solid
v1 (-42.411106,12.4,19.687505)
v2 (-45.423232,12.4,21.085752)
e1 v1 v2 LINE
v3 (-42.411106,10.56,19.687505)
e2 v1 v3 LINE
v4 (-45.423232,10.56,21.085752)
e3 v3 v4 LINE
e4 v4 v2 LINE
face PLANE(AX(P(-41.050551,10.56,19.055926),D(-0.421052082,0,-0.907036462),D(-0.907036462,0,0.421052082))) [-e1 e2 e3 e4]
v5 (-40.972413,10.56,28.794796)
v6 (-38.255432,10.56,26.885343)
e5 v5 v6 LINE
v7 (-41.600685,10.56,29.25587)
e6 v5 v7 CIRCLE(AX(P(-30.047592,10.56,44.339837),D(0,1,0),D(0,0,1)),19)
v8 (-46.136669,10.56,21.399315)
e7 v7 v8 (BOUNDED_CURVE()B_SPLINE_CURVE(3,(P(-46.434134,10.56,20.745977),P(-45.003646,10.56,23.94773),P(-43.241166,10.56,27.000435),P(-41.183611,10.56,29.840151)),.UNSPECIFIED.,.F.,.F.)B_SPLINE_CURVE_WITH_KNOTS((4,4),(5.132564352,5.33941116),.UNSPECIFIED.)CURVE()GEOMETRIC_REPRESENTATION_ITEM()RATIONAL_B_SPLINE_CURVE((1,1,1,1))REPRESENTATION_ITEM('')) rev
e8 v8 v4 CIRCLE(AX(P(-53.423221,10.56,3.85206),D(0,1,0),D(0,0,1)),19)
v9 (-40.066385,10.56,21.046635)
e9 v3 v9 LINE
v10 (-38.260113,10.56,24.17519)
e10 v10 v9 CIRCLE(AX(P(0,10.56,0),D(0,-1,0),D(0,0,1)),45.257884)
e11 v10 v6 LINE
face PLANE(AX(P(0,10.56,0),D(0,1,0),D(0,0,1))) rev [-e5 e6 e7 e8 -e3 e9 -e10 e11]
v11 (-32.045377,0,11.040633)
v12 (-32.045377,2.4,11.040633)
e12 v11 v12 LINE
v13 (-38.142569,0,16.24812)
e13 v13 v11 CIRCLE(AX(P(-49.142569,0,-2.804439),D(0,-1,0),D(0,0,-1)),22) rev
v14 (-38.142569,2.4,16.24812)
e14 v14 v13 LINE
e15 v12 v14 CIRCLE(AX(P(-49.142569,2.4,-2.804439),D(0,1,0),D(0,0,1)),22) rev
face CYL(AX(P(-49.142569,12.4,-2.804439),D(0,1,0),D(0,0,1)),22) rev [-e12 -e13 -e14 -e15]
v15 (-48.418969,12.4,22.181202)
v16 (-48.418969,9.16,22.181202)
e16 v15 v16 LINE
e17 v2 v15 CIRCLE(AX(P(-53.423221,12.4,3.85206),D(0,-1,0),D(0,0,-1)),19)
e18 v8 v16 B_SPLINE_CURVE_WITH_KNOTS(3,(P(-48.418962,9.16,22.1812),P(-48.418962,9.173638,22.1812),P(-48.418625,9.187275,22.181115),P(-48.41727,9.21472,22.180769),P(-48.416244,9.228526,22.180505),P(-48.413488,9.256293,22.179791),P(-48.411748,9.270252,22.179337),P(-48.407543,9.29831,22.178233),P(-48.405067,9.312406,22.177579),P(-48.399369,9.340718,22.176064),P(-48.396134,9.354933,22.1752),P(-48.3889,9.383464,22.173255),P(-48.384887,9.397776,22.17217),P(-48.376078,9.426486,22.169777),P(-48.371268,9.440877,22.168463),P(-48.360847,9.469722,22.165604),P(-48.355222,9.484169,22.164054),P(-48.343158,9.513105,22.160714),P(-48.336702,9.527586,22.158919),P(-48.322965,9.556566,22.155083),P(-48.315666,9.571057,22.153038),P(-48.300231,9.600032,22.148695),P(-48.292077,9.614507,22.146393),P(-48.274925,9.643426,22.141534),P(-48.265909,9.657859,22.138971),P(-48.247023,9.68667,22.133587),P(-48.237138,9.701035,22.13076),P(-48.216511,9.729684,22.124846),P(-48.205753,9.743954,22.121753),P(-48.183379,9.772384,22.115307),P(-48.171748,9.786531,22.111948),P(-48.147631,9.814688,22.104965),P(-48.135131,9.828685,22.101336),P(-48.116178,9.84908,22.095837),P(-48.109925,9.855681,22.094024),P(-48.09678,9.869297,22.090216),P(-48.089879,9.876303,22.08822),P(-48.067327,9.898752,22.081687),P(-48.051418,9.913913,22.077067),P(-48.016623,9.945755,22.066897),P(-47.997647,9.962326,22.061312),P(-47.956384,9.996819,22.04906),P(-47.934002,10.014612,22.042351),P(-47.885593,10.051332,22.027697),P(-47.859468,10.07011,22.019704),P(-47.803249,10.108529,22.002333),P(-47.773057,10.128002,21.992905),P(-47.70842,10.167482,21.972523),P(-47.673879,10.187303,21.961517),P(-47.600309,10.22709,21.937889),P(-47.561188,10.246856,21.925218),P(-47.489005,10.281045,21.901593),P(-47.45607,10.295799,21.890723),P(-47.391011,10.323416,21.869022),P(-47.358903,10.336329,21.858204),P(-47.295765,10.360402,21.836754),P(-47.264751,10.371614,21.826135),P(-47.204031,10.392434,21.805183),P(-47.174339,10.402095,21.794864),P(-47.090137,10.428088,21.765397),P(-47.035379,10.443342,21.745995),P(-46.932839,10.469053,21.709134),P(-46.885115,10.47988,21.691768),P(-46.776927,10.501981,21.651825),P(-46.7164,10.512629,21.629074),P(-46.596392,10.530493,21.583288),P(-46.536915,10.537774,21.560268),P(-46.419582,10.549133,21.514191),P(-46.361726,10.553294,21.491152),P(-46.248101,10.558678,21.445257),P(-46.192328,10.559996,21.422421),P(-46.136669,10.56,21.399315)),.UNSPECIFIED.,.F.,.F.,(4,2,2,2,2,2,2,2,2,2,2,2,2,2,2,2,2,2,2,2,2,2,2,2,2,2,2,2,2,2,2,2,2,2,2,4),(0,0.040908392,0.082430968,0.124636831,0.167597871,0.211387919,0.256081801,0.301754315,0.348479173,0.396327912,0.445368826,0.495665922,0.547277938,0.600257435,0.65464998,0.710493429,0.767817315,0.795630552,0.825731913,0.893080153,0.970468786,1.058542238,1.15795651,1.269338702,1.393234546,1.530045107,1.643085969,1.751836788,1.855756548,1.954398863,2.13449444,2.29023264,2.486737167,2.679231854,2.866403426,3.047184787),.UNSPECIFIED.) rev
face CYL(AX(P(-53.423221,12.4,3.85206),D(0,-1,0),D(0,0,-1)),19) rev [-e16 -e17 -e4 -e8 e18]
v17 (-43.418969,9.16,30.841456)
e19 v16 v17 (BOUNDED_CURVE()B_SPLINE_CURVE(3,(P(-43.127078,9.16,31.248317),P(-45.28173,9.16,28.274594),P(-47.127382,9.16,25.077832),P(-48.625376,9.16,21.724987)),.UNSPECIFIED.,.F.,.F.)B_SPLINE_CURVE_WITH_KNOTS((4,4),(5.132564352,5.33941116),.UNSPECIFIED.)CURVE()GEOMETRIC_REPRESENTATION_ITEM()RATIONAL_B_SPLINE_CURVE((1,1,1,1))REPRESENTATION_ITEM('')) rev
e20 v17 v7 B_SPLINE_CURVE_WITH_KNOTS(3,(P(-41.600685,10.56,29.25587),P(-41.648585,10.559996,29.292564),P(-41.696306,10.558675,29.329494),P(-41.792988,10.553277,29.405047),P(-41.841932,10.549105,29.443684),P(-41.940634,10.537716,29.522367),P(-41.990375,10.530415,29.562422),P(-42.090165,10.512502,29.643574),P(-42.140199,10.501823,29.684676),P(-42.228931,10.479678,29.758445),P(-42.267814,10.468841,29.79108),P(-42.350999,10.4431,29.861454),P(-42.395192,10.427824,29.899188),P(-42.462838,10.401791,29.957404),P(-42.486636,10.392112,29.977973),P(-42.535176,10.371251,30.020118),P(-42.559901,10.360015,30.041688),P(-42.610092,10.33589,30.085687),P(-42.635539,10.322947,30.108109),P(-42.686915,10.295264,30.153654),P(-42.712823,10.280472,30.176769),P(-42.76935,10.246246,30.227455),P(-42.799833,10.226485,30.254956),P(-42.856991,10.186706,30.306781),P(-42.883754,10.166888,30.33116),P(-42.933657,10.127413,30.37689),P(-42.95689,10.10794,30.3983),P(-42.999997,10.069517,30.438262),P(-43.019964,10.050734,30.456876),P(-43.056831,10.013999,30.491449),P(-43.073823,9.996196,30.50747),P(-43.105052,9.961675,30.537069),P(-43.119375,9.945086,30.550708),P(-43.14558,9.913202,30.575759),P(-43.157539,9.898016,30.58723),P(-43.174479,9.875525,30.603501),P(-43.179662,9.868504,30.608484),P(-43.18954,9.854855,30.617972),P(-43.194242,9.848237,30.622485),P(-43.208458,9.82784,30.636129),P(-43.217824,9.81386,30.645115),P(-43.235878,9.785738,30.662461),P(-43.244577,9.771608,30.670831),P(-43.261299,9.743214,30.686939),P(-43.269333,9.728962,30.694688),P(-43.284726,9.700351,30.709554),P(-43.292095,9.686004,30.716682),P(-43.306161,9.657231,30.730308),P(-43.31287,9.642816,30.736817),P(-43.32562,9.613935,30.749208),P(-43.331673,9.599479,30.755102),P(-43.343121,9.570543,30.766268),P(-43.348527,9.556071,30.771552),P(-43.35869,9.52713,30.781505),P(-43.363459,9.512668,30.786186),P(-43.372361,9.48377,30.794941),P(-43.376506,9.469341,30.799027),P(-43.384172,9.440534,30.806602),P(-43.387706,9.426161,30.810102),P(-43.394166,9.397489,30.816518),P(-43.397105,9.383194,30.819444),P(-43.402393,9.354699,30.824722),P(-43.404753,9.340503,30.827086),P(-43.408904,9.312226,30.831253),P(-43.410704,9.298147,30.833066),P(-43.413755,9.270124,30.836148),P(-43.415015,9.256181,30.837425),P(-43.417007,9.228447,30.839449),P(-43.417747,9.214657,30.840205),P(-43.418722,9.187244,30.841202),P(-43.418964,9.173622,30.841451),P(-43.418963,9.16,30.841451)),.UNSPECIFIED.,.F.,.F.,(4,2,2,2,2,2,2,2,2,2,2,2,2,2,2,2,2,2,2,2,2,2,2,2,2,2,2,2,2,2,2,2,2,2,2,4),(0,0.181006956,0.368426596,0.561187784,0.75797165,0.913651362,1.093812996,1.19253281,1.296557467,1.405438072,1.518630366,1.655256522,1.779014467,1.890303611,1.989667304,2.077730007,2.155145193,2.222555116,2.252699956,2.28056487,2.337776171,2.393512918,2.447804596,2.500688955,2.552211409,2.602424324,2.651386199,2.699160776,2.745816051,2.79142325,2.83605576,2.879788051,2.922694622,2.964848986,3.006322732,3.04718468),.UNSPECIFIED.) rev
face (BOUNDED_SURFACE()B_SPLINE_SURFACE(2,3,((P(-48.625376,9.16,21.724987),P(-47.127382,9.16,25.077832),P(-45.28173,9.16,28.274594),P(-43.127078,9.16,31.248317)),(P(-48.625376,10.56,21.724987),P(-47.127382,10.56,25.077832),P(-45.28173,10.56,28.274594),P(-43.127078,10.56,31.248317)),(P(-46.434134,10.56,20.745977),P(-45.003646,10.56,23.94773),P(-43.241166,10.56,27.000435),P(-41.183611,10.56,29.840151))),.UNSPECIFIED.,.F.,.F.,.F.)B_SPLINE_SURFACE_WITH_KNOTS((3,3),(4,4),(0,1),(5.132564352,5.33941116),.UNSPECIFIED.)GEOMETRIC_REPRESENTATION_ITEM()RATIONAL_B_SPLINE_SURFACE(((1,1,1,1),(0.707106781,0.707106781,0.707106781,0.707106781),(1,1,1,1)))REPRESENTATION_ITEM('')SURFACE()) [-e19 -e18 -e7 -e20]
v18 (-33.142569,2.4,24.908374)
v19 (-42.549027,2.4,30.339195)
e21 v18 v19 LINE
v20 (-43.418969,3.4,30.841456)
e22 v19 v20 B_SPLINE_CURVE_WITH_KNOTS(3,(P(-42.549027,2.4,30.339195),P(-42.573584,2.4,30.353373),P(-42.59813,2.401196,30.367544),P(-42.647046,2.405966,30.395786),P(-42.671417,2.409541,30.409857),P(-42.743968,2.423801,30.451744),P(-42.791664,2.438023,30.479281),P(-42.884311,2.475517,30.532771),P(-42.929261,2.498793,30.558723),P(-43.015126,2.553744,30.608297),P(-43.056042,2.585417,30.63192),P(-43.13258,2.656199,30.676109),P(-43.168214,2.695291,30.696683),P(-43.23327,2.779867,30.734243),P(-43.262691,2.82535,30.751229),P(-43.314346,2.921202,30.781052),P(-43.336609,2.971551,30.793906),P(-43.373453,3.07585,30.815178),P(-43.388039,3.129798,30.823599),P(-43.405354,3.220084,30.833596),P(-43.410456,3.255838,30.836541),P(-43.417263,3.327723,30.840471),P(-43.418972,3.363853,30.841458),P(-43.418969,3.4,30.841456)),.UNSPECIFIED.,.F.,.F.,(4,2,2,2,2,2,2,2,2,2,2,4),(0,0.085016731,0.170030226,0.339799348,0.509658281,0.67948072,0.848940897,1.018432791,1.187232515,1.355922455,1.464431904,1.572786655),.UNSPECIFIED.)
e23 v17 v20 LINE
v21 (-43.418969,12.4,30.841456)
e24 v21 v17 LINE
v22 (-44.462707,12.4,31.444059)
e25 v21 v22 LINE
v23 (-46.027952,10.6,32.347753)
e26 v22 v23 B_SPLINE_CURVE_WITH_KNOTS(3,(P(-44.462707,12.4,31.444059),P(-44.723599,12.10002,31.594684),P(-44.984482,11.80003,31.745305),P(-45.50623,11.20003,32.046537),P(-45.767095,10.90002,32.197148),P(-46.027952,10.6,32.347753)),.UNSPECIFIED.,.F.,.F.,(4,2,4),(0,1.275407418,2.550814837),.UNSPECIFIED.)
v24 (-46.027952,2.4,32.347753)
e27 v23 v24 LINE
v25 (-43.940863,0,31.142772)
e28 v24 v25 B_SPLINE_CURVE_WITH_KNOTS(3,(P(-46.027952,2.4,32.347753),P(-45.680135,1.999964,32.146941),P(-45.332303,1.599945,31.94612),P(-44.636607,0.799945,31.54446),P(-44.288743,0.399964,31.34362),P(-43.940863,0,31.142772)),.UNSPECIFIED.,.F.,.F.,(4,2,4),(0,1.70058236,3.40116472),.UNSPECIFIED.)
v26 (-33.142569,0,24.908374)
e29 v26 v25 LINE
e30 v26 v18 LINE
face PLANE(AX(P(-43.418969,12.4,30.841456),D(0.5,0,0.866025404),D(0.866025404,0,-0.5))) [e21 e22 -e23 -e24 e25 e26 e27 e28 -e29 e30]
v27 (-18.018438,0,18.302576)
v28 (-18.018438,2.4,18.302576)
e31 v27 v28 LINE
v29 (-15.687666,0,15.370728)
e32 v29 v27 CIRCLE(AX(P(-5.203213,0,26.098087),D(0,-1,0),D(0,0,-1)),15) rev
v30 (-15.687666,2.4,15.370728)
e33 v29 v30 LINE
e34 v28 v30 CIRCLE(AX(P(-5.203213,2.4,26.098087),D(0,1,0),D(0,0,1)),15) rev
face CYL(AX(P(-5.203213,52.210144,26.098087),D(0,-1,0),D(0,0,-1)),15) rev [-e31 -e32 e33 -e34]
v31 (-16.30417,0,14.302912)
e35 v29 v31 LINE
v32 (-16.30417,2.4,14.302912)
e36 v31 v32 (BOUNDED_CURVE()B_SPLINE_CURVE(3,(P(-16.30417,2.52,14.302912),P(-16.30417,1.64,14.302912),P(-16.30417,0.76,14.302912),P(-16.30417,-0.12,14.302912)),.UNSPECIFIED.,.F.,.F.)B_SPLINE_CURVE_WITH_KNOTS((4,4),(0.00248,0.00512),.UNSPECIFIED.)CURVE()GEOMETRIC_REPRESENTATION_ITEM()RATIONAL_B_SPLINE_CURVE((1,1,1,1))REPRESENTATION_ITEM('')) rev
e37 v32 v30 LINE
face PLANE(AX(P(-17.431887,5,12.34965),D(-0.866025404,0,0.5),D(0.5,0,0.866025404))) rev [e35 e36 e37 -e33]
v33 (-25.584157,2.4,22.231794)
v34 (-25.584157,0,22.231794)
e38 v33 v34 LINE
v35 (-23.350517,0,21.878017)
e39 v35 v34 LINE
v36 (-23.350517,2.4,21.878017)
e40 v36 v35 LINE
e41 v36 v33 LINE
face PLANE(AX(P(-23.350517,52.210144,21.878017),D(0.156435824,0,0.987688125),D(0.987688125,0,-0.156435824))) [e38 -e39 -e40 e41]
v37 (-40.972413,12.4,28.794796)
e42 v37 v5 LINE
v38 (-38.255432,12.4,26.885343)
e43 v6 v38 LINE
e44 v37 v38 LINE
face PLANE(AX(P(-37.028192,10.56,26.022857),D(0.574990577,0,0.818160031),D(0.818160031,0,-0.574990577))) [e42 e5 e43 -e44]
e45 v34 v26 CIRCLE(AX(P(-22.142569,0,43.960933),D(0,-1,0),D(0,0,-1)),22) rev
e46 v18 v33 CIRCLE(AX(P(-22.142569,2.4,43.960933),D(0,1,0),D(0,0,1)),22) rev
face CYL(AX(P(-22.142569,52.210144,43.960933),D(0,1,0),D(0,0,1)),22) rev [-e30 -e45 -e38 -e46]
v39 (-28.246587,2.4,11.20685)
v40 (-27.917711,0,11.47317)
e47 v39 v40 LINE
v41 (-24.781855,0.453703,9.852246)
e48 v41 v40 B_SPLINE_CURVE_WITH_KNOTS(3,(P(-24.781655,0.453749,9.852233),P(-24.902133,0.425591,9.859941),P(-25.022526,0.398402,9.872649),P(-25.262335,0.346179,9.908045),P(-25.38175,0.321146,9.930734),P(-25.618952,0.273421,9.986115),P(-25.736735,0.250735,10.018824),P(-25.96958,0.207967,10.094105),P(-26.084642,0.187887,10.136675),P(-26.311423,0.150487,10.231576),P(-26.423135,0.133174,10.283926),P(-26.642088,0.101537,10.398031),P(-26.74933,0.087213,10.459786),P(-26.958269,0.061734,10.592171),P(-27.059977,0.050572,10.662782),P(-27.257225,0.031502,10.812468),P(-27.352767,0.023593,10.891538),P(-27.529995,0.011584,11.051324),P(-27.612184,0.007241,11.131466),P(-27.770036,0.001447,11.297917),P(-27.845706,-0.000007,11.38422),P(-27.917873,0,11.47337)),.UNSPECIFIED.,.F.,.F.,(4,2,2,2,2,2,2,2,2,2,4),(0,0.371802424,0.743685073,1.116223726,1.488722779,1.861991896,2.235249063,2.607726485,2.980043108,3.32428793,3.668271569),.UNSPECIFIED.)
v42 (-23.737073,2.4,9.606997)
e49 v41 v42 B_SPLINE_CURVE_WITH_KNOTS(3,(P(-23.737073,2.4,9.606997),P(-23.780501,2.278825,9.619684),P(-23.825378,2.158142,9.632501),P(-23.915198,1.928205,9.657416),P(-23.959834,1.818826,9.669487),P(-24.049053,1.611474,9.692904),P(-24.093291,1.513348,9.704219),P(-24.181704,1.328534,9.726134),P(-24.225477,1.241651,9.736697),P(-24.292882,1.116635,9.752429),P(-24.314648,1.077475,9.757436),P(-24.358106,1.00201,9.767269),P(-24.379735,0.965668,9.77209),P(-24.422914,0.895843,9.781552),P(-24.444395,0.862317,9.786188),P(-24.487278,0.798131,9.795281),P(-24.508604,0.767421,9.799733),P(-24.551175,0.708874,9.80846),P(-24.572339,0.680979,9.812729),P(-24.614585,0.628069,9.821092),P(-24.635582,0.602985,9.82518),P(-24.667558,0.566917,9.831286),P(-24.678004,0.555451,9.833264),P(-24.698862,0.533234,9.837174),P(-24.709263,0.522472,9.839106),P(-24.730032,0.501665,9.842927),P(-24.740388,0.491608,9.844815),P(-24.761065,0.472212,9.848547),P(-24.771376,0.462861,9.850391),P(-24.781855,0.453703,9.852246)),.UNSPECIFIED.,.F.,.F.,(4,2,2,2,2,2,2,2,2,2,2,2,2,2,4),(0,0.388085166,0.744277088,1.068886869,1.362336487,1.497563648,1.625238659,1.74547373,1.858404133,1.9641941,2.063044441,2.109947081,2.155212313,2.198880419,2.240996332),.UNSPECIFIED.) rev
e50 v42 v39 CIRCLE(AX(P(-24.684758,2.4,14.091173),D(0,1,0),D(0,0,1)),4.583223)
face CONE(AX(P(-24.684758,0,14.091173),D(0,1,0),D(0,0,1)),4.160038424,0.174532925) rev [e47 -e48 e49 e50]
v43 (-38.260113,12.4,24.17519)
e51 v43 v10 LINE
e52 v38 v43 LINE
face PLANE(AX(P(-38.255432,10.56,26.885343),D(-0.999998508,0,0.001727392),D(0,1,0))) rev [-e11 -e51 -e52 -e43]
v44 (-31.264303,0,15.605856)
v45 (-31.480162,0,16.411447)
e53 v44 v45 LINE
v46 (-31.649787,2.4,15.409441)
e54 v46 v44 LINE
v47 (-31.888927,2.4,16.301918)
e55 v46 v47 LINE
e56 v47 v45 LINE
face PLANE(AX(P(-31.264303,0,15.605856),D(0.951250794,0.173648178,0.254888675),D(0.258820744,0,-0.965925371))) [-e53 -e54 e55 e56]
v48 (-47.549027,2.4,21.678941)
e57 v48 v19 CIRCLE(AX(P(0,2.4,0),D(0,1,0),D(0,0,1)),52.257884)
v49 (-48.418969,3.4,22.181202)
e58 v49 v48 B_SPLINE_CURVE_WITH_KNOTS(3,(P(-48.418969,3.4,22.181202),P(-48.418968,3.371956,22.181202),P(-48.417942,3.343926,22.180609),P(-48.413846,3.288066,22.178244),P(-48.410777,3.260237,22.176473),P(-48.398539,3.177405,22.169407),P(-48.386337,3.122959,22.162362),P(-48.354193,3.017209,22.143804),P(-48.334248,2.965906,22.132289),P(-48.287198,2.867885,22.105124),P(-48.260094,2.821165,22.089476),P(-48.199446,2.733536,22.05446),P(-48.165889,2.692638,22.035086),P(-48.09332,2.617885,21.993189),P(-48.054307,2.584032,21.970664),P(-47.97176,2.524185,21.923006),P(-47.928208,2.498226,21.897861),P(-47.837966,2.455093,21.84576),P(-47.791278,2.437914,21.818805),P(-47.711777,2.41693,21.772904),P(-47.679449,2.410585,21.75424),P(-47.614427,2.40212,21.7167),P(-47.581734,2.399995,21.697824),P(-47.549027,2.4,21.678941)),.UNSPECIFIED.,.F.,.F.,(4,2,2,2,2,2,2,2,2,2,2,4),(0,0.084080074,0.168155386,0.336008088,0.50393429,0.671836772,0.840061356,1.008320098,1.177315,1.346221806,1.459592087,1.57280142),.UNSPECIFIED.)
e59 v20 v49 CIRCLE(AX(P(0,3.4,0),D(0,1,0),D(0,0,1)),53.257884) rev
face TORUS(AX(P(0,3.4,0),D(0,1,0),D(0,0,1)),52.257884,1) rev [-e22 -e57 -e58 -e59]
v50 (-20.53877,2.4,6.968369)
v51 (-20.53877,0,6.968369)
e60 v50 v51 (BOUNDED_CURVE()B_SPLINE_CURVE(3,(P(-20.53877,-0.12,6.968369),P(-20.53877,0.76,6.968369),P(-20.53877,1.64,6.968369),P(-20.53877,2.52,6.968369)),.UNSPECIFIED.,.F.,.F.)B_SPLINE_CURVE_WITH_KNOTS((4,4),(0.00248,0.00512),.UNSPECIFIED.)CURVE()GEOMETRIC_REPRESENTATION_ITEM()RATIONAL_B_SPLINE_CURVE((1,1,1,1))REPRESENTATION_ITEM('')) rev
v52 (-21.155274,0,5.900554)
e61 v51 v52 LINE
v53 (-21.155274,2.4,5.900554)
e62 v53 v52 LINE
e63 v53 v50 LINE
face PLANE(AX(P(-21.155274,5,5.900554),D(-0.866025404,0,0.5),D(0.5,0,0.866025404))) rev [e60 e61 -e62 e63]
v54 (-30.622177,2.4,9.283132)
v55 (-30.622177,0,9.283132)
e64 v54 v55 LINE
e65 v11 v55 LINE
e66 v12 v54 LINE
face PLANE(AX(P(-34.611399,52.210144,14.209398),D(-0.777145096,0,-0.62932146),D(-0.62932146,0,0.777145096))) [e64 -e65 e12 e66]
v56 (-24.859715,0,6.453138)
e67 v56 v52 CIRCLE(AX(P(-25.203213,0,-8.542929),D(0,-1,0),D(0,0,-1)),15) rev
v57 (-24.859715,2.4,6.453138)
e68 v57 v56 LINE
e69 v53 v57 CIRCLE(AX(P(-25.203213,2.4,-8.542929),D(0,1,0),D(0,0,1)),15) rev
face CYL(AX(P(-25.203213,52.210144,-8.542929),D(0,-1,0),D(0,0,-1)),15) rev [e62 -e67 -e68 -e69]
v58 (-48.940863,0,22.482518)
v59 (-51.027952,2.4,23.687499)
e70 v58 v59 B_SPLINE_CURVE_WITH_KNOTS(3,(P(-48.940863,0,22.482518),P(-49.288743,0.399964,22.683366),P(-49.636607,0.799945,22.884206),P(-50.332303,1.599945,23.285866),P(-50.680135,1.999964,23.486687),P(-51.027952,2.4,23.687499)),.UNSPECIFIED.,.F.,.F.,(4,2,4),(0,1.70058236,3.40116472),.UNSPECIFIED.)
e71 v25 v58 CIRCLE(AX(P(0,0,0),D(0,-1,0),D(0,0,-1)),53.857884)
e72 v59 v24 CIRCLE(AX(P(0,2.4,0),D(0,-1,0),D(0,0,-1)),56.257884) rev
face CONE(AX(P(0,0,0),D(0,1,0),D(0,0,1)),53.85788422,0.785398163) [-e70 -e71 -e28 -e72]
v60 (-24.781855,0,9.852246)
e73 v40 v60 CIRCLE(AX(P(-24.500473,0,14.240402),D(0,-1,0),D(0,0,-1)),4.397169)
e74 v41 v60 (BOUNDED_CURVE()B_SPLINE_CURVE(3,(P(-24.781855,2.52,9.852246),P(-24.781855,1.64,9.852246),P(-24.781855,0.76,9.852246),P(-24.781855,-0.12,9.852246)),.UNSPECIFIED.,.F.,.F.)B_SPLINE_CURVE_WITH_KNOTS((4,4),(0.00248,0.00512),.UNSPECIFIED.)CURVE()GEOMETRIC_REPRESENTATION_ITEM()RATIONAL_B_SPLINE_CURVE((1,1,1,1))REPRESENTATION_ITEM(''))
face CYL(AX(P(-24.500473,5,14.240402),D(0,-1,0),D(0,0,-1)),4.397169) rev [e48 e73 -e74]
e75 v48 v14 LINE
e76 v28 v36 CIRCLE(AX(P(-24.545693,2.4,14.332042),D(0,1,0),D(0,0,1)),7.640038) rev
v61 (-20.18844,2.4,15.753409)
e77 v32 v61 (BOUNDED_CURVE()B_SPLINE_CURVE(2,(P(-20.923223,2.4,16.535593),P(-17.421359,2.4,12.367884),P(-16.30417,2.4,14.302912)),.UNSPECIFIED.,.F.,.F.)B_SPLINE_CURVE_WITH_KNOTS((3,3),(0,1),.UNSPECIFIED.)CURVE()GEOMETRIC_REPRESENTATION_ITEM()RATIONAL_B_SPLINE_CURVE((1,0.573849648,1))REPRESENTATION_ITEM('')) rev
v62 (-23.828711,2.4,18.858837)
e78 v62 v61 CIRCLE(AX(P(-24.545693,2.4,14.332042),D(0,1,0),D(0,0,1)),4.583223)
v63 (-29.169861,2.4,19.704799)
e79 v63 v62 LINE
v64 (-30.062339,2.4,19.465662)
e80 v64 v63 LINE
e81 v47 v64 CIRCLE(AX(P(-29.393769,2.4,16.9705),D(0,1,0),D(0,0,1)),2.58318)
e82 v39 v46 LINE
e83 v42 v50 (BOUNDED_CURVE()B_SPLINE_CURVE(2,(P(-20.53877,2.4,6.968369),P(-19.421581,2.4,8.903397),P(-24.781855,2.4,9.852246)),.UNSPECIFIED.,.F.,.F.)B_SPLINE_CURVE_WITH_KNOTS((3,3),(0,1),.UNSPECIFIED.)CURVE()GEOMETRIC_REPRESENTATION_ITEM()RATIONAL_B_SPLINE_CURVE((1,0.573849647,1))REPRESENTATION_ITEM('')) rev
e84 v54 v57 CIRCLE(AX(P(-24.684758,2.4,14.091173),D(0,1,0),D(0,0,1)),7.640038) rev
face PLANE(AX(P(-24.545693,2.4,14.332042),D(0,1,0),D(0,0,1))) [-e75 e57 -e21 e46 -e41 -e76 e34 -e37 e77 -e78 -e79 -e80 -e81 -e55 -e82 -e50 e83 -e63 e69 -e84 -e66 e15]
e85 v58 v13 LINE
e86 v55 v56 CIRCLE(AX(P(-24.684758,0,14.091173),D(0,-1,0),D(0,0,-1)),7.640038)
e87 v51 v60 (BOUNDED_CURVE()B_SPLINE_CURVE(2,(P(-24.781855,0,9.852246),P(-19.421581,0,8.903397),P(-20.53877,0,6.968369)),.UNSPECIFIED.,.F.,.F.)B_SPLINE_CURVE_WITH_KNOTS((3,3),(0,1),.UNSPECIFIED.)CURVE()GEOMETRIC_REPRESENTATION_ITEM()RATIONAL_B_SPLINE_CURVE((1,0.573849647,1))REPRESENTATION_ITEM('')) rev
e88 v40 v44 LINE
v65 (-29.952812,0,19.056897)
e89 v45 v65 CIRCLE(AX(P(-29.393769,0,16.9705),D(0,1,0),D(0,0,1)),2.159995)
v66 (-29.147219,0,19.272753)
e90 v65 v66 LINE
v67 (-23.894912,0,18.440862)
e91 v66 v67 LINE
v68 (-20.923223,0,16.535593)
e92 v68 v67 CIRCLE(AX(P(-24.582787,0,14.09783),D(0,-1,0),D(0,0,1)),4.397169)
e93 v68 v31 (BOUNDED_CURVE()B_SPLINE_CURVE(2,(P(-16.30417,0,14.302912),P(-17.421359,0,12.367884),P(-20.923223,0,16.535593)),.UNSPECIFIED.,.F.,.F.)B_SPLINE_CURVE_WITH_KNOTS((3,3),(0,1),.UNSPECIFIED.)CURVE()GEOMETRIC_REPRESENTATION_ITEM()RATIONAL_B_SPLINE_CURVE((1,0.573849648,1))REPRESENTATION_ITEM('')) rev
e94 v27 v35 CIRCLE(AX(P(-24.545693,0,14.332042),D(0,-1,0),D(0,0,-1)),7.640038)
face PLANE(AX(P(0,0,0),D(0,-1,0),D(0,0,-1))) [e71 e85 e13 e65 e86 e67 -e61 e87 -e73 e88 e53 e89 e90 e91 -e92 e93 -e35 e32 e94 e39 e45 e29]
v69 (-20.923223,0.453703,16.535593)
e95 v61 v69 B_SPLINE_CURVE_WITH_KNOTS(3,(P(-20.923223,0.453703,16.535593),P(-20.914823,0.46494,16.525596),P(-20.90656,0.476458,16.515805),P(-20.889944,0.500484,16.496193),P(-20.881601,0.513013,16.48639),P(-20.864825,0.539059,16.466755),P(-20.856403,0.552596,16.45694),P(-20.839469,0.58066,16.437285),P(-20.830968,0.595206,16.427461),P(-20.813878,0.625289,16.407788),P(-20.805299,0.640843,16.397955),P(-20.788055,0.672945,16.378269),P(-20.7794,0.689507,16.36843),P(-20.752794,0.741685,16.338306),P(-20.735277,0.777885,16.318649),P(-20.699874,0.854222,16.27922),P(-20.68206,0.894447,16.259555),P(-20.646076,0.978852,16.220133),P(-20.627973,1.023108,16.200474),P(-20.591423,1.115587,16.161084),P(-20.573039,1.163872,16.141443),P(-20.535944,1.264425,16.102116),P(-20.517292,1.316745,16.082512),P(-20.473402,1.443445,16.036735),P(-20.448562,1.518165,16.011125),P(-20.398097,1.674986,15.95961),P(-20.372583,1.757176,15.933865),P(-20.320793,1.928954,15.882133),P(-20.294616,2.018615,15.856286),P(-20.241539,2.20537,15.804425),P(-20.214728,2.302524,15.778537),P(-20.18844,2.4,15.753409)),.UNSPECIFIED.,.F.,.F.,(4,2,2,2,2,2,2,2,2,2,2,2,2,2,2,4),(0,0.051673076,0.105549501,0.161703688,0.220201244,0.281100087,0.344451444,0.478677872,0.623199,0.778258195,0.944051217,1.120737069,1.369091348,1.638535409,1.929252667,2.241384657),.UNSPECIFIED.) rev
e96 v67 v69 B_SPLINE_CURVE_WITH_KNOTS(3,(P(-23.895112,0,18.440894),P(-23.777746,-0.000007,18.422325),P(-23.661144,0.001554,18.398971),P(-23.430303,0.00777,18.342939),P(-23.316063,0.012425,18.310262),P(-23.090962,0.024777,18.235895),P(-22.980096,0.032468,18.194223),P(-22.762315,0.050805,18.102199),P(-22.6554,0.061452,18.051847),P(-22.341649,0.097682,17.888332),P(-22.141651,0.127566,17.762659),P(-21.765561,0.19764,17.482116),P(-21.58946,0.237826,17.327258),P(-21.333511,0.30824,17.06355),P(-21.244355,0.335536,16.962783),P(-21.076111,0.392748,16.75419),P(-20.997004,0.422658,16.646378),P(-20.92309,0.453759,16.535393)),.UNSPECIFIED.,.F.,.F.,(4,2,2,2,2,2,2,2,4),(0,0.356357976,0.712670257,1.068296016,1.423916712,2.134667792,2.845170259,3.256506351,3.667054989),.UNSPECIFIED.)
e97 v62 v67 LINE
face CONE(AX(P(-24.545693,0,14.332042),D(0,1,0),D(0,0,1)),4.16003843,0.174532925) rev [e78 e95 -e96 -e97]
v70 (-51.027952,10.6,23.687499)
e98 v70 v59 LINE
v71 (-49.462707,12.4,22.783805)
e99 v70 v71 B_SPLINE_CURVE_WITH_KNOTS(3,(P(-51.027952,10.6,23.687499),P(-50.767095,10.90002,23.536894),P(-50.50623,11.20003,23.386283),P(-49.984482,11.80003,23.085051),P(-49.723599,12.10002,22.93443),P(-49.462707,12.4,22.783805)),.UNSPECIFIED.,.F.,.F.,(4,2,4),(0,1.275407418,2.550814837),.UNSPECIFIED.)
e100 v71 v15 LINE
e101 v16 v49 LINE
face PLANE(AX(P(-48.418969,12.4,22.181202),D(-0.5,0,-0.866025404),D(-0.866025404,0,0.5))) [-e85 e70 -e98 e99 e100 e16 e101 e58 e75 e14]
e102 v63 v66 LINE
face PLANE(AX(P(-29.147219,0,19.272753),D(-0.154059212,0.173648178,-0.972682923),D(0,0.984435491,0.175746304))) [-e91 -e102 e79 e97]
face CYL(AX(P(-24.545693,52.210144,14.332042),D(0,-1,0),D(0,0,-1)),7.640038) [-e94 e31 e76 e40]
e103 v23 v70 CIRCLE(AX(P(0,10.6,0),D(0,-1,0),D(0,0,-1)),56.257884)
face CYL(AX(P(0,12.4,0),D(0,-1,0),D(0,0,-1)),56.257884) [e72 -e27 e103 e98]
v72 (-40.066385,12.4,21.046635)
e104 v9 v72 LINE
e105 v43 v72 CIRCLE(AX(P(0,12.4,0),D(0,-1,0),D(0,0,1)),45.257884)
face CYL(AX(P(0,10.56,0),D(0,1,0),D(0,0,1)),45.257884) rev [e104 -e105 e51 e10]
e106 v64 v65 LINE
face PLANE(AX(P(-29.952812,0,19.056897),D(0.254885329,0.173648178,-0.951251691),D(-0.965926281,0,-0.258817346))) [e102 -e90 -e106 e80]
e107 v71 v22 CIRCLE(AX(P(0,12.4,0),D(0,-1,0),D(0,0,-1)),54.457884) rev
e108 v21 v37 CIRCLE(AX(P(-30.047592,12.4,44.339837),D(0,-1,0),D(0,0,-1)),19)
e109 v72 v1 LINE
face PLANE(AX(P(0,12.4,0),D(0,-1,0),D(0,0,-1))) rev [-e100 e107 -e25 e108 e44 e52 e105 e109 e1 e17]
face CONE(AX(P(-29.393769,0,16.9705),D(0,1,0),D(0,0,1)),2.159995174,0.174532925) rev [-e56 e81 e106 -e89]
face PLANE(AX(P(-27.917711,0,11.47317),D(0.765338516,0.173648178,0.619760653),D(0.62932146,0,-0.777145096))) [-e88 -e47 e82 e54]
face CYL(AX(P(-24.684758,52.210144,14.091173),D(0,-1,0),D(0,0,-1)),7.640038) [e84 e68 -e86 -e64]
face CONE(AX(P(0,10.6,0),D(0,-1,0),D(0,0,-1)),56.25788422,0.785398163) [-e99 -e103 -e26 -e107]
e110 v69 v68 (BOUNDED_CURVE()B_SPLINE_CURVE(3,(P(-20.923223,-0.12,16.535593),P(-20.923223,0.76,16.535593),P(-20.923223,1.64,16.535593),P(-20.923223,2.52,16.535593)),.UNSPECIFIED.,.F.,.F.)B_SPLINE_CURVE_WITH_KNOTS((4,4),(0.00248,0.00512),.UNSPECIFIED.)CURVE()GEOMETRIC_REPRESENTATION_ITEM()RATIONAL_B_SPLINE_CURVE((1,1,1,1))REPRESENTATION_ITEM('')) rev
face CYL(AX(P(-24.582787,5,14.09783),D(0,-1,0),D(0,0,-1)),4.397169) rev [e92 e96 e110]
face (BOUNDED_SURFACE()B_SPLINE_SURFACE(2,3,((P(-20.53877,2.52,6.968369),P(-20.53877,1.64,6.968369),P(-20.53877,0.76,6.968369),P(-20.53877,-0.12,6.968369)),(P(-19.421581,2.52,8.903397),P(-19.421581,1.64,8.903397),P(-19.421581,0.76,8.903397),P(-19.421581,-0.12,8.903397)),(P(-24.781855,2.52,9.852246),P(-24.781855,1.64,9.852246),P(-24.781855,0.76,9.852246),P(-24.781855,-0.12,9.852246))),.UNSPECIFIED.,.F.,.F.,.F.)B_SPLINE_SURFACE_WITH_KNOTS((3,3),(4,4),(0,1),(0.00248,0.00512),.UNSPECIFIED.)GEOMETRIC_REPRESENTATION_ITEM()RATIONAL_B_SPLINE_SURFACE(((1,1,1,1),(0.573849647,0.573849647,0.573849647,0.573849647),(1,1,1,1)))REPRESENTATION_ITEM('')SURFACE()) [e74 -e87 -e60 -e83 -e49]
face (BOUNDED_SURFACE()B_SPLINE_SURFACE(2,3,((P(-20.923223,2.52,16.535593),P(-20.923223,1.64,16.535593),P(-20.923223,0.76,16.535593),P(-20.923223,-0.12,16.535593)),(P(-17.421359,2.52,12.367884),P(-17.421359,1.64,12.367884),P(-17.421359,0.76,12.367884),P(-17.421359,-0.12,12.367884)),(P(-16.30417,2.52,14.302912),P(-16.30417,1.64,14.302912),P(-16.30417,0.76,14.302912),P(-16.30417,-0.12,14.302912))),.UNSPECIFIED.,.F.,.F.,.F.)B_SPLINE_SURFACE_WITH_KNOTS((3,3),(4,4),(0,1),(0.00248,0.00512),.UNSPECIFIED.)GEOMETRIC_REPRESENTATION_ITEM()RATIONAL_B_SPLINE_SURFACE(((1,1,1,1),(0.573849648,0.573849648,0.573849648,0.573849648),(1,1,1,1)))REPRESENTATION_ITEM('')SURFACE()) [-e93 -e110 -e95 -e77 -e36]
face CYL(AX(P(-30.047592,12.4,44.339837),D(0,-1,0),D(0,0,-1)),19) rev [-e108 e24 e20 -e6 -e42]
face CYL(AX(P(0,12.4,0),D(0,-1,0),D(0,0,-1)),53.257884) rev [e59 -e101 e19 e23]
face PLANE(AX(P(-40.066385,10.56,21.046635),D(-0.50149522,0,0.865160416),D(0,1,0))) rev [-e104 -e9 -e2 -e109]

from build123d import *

# Parameters (mm, degrees)
EXTRUDE_1_DEPTH     = 2.4
EXTRUDE_1_DRAFT     = 10
EXTRUDE_2_DEPTH     = 12.4
EXTRUDE_4_DEPTH     = 2.4
EXTRUDE_START       = -1.84
EXTRUDE_3_DEPTH     = 1.84
CHAMFER_1_SIZE      = 2.4
FILLET_3_R          = 1
FILLET_4_R          = 19
CHAMFER_2_SIZE      = 1.5
CHAMFER_3_SIZE      = 1.5
FILLET_5_SIZE       = 2.4
FILLET_5_SIZE_2     = 1.4
FILLET_8_R          = 15
CUT_EXTRUDE_2_DEPTH = 5
FILLET_6_DEPTH      = 3
FILLET_START        = -1
FILLET_7_DEPTH      = 4
CHAMFER_4_SIZE      = 1.8
FILLET_9_R          = 22


with BuildPart() as part:
    # 草图1 → 凸台-拉伸1 (with draft: the straight prism first)
    with BuildSketch(Plane(origin=(0, 0, 0), x_dir=(1, 0, 0), z_dir=(0, 1, 0))):
        with BuildLine():
            Line((-8, -10.392304845), (-13, -1.732050808))
            Line((-13, -1.732050808), (-21.967816979, -6.909622355))
            Line((-21.967816979, -6.909622355), (-22.707395472, -6.711455524))
            ThreePointArc((-22.707395472, -6.711455524), (-27.045667208, -6.825066474), (-30.622176838, -9.283132374))
            Line((-30.622176838, -9.283132374), (-34.43427487, -13.990668154))
            Line((-34.43427487, -13.990668154), (-34.611399325, -14.209398026))
            Line((-34.611399325, -14.209398026), (-48.418968561, -22.181201841))
            ThreePointArc((-48.418968561, -22.181201841), (-46.122680686, -26.62894211), (-43.418968561, -30.841455878))
            Line((-43.418968561, -30.841455878), (-29.611399325, -22.869652063))
            Line((-29.611399325, -22.869652063), (-29.333411472, -22.825622721))
            Line((-29.333411472, -22.825622721), (-23.350516885, -21.878016874))
            ThreePointArc((-23.350516885, -21.878016874), (-19.433514554, -20.009701627), (-17.165988715, -16.309453567))
            Line((-17.165988715, -16.309453567), (-16.967816979, -15.569876393))
            Line((-16.967816979, -15.569876393), (-8, -10.392304845))
        make_face()
        with BuildLine():
            Line((-27.917710858, -11.473169763), (-31.264303283, -15.605855609))
            Line((-31.264303283, -15.605855609), (-31.480162481, -16.411447438))
            ThreePointArc((-31.480162481, -16.411447438), (-31.264379417, -18.05049777), (-29.952811807, -19.056896659))
            Line((-29.952811807, -19.056896659), (-29.147219046, -19.27275307))
            Line((-29.147219046, -19.27275307), (-23.894912088, -18.440861966))
            ThreePointArc((-23.894912088, -18.440861966), (-21.762087, -17.423555776), (-20.527408298, -15.408754734))
            Line((-20.527408298, -15.408754734), (-19.958845574, -13.286877913))
            ThreePointArc((-19.958845574, -13.286877913), (-20.174626779, -11.647826039), (-21.486196869, -10.641428268))
            Line((-21.486196869, -10.641428268), (-23.608077089, -10.07287972))
            ThreePointArc((-23.608077089, -10.07287972), (-25.97028529, -10.134742248), (-27.917710858, -11.473169763))
        make_face(mode=Mode.SUBTRACT)
    extrude(amount=EXTRUDE_1_DEPTH)
    # 凸台-拉伸1: the draft: its side faces are tilted about the plane it starts from
    extrude_1_sides = [part.faces().sort_by_distance(p)[0] for p in [
        (-26.480958105, 1.2, 22.373834469),
        (-29.59100707, 1.2, 13.539512686),
        (-31.372232882, 1.2, 16.008651523),
        (-31.264379417, 1.2, 18.05049777),
        (-29.550015427, 1.2, 19.164824864),
        (-26.521065567, 1.2, 18.856807518),
        (-21.762087, 1.2, 17.423555776),
        (-20.243126936, 1.2, 14.347816323),
        (-20.174626779, 1.2, 11.647826039),
        (-22.547136979, 1.2, 10.357153994),
        (-25.97028529, 1.2, 10.134742248),
        (-46.122680686, 1.2, 26.62894211),
        (-41.515183943, 1.2, 18.195299933),
        (-32.616788082, 1.2, 11.7462652),
        (-27.045667208, 1.2, 6.825066474),
        (-22.337606226, 1.2, 6.810538939),
        (-17.48390849, 1.2, 4.320836581),
        (-10.5, 1.2, 6.062177826),
        (-12.48390849, 1.2, 12.981090619),
        (-17.066902847, 1.2, 15.93966498),
        (-36.515183943, 1.2, 26.855553971),
        (-19.433514554, 1.2, 20.009701627),
    ]]
    draft(extrude_1_sides, Plane(origin=(0, 0, 0), x_dir=(1, 0, 0), z_dir=(0, 1, 0)), EXTRUDE_1_DRAFT)



with BuildPart() as body_2:
    # 草图3 → 凸台-拉伸2 (new body)
    with BuildSketch(Plane.XZ):
        with BuildLine():
            Line((-43.418968561, 30.841455878), (-46.027952282, 32.347753332))
            ThreePointArc((-46.027952282, 32.347753332), (-48.720756898, 28.12894211), (-51.027952282, 23.687499294))
            Line((-51.027952282, 23.687499294), (-48.418968561, 22.181201841))
            ThreePointArc((-48.418968561, 22.181201841), (-46.122680686, 26.62894211), (-43.418968561, 30.841455878))
        make_face()
    extrude(amount=-EXTRUDE_2_DEPTH)


with BuildPart() as part_1:
    add(part.part)

    add(body_2.part)  # 凸台-拉伸4 merges body 2
    # 草图2 → 凸台-拉伸4 (add)
    with BuildSketch(Plane.XZ):
        with BuildLine():
            Line((-13, 1.732050808), (-8, 10.392304845))
            Line((-8, 10.392304845), (-16.967816979, 15.569876393))
            Line((-16.967816979, 15.569876393), (-17.165988715, 16.309453567))
            ThreePointArc((-17.165988715, 16.309453567), (-19.433514554, 20.009701627), (-23.350516885, 21.878016874))
            Line((-23.350516885, 21.878016874), (-29.611399325, 22.869652063))
            Line((-29.611399325, 22.869652063), (-43.418968561, 30.841455878))
            ThreePointArc((-43.418968561, 30.841455878), (-46.122680686, 26.62894211), (-48.418968561, 22.181201841))
            Line((-48.418968561, 22.181201841), (-34.611399325, 14.209398026))
            Line((-34.611399325, 14.209398026), (-30.622176838, 9.283132374))
            ThreePointArc((-30.622176838, 9.283132374), (-27.045667208, 6.825066474), (-22.707395472, 6.711455524))
            Line((-22.707395472, 6.711455524), (-21.967816979, 6.909622355))
            Line((-21.967816979, 6.909622355), (-13, 1.732050808))
        make_face()
        Polygon((-28.267922288, 9.695660603), (-32.994912051, 15.569876392), (-31.812956682, 19.594100966), (-26.346816011, 20.919608689), (-19.040272004, 17.121163853), (-18.489608424, 9.956624946), (-26.72941961, 8.295337377), align=None, mode=Mode.SUBTRACT)
    extrude(amount=-EXTRUDE_4_DEPTH)

    # 草图4 → 凸台-拉伸3 (add)
    with BuildSketch(Plane(origin=(0, 12.4, 0), x_dir=(1, 0, 0), z_dir=(0, 1, 0)).offset(EXTRUDE_START)):
        with BuildLine():
            Line((-41.050551196, -19.055926389), (-51.027952282, -23.687499294))
            ThreePointArc((-51.027952282, -23.687499294), (-48.720756898, -28.12894211), (-46.027952282, -32.347753332))
            Line((-46.027952282, -32.347753332), (-37.028191944, -26.02285698))
            ThreePointArc((-37.028191944, -26.02285698), (-39.194477456, -22.62894211), (-41.050551196, -19.055926389))
        make_face()
    extrude(amount=EXTRUDE_3_DEPTH)

    # 倒角1
    chamfer_1_edges = [part_1.edges().sort_by_distance(p)[0] for p in [
        (-48.720756898, 0, 28.12894211),
    ]]
    chamfer(chamfer_1_edges, length=CHAMFER_1_SIZE)

    # 圆角3
    fillet_3_edges = [part_1.edges().sort_by_distance(p)[0] for p in [
        (-46.122680686, 2.4, 26.62894211),
    ]]
    fillet(fillet_3_edges, radius=FILLET_3_R)

    # 圆角4
    # the kernel refuses this fillet: 19 mm, written as the material it adds along each edge
    with BuildSketch(Plane(origin=(-43.57347219, 12.4, 30.6227816), x_dir=(0.577045376166988, 0, 0.8167120874851181), z_dir=(0, -1, 0))) as fillet_4_piece_1:
        with BuildLine():
            CenterArc((19.007931444, -3.131386572), FILLET_4_R, 170.513813317, 9.63021169)
            Line((0.007991472, -3.179147023), (0, 0))
            ThreePointArc((0, 0), (0.133874766, 0.000168261), (0.267749531, 0))
        make_face()
    extrude(amount=1.84)
    with BuildSketch(Plane(origin=(-48.306842895, 12.4, 22.424343047), x_dir=(-0.4187707272566132, 0, -0.908091998639437), z_dir=(0, -1, 0))) as fillet_4_piece_2:
        with BuildLine():
            CenterArc((19.007931444, 3.131386572), FILLET_4_R, 179.855974993, 9.63021169)
            Line((0.007991472, 3.179147023), (0, 0))
            ThreePointArc((0, 0), (0.133874766, -0.000168261), (0.267749531, 0))
        make_face()
    extrude(amount=1.84)

    # 倒角2
    # the kernel refuses this chamfer: 2.14222201, 1.5 mm, written as the material it takes off along each edge
    with BuildSketch(Plane(origin=(-41.050551196, 4.828583957, 19.055926389), x_dir=(-0.9070364623462953, 0, 0.4210520822586176), z_dir=(0, 1, 0))) as chamfer_2_piece_1:
        with BuildLine():
            Line((CHAMFER_2_SIZE, 0), (-0.054482274, 2.220030761))
            ThreePointArc((-0.054482274, 2.220030761), (-0.014513006, 1.146056403), (0, 0))
            Line((0, 0), (CHAMFER_2_SIZE, 0))
        make_face()
    extrude(amount=13.302832086, mode=Mode.SUBTRACT)

    # 倒角3
    # the kernel refuses this chamfer: 2.14222201, 1.5 mm, written as the material it takes off along each edge
    with BuildSketch(Plane(origin=(-37.028191944, 4.828583957, 26.02285698), x_dir=(-0.5547448997341907, 0, -0.8320204902638533), z_dir=(0, 1, 0))) as chamfer_3_piece_1:
        with BuildLine():
            Line((2.220699191, 0), (-CHAMFER_3_SIZE * 0.0245338379121, CHAMFER_3_SIZE * 0.999699000098))
            Line((-CHAMFER_3_SIZE * 0.0245338379121, CHAMFER_3_SIZE * 0.999699000098), (0, 0))
            ThreePointArc((0, 0), (1.1460675, 0.013608524), (2.220699191, 0))
        make_face()
    extrude(amount=13.302832086, mode=Mode.SUBTRACT)

    # 圆角5
    # a fillet whose section is not a circle: 2.4, 1.4 mm, written as the material it adds along each edge
    with BuildSketch(Plane(origin=(0, 10.56, 0), x_dir=(-0.8181600307253523, 0, 0.5749905774214832), z_dir=(0.5749905774214832, 0, 0.8181600307253523))) as fillet_5_piece_1:
        with BuildLine():
            Bezier((53.25788422 - FILLET_5_SIZE, 0), (53.25788422, 0), (53.25788422, FILLET_5_SIZE_2), weights=[1, 0.707106781, 1])
            Line((53.25788422, FILLET_5_SIZE_2), (53.25788422, 0))
            Line((53.25788422, 0), (53.25788422 - FILLET_5_SIZE, 0))
        make_face()
    revolve(axis=Axis((0, 10.56, 0), (0, -1, 0)), revolution_arc=10.197944658)
    with BuildSketch(Plane(origin=(1.03e-07, 10.56, -7.3e-08), x_dir=(-0.8181600307218722, 0, 0.574990577426435), z_dir=(-0.574990577426435, 0, -0.8181600307218722))) as fillet_5_piece_2_section:
        with BuildLine():
            Bezier((53.257884346 - FILLET_5_SIZE, 0), (53.257884346, 0), (53.257884346, -FILLET_5_SIZE_2), weights=[1, 0.707106781, 1])
            Line((53.257884346, -FILLET_5_SIZE_2), (53.257884346, 0))
            Line((53.257884346, 0), (53.257884346 - FILLET_5_SIZE, 0))
        make_face()
    fillet_5_piece_2 = revolve(axis=Axis((1.03e-07, 10.56, -7.3e-08), (0, 1, 0)), revolution_arc=6.742956788, mode=Mode.PRIVATE)
    fillet_5_piece_2 = fillet_5_piece_2 - Plane(origin=(-30.047591975, 10.56, 44.339836826), x_dir=(0.5770453761670518, 0, 0.8167120874850732), z_dir=(0, 1, 0)) * Cylinder(19, 214, mode=Mode.PRIVATE)
    add(fillet_5_piece_2)
    with BuildSketch(Plane(origin=(1.14e-07, 10.56, -5.3e-08), x_dir=(-0.9070364623485727, 0, 0.4210520822537116), z_dir=(0.4210520822537116, 0, 0.9070364623485727))) as fillet_5_piece_3_section:
        with BuildLine():
            Bezier((53.257884346 - FILLET_5_SIZE, 0), (53.257884346, 0), (53.257884346, FILLET_5_SIZE_2), weights=[1, 0.707106781, 1])
            Line((53.257884346, FILLET_5_SIZE_2), (53.257884346, 0))
            Line((53.257884346, 0), (53.257884346 - FILLET_5_SIZE, 0))
        make_face()
    fillet_5_piece_3 = revolve(axis=Axis((1.14e-07, 10.56, -5.3e-08), (0, -1, 0)), revolution_arc=6.742956788, mode=Mode.PRIVATE)
    fillet_5_piece_3 = fillet_5_piece_3 - Plane(origin=(-53.423221079, 10.56, 3.85205956), x_dir=(-0.41877072725709835, 0, -0.9080919986392134), z_dir=(0, 1, 0)) * Cylinder(19, 214, mode=Mode.PRIVATE)
    add(fillet_5_piece_3)

    # 圆角8
    fillet_8_edges = [part_1.edges().sort_by_distance(p)[0] for p in [
        (-16.967816979, 1.2, 15.569876393),
        (-21.967816979, 1.2, 6.909622355),
    ]]
    fillet(fillet_8_edges, radius=FILLET_8_R)

    # 草图5 → 切除-拉伸2 (cut)
    with BuildSketch(Plane.XZ):
        with BuildLine():
            Line((-29.147219046, 19.27275307), (-31.264303283, 15.605855609))
            Line((-31.264303283, 15.605855609), (-27.917710858, 11.473169763))
            ThreePointArc((-27.917710858, 11.473169763), (-26.519580592, 10.33421548), (-24.781854923, 9.852245982))
            ThreePointArc((-24.781854923, 9.852245982), (-22.061802465, 9.586923289), (-19.411053684, 8.921632073))
            Line((-19.411053684, 8.921632073), (-21.155274081, 5.900553727))
            Line((-21.155274081, 5.900553727), (-15.208253994, -4.420406035))
            Line((-15.208253994, -4.420406035), (0.192169605, 10.177783302))
            Line((0.192169605, 10.177783302), (-15.687666464, 15.370727914))
            Line((-15.687666464, 15.370727914), (-17.431886861, 12.349649567))
            ThreePointArc((-17.431886861, 12.349649567), (-19.333420345, 14.312619743), (-20.923222766, 16.535592924))
            ThreePointArc((-20.923222766, 16.535592924), (-22.209483528, 17.799522767), (-23.894912088, 18.440861966))
            Line((-23.894912088, 18.440861966), (-29.147219046, 19.27275307))
        make_face()
    extrude(amount=-CUT_EXTRUDE_2_DEPTH, mode=Mode.SUBTRACT)

    # 圆角6: read off the stored shape, not the designer's step
    # 圆角6 outline → 圆角6 (cut)
    with BuildSketch(Plane(origin=(0, 0, 0), x_dir=(1, 0, 0), z_dir=(0, 1, 0))):
        with BuildLine():
            Line((-19.411053684, -8.921632073), (-20.538770468, -6.968369307))
            add(Edge.make_bspline(
                [(-20.538770468, -6.968369307), (-19.421581423, -8.903397494), (-24.781854923, -9.852245982)],
                knots=[0, 0, 0, 1, 1, 1], degree=2, weights=[1, 0.573849647, 1]))
            ThreePointArc((-24.781854923, -9.852245982), (-22.061802466, -9.586923289), (-19.411053684, -8.921632073))
        make_face()
    extrude(amount=FILLET_6_DEPTH, mode=Mode.SUBTRACT)

    # 圆角7: read off the stored shape, not the designer's step
    # 圆角7 outline → 圆角7 (cut)
    with BuildSketch(Plane(origin=(0, 0, 0), x_dir=(1, 0, 0), z_dir=(0, 1, 0)).offset(FILLET_START)):
        with BuildLine():
            ThreePointArc((-17.431886861, -12.349649567), (-19.333420346, -14.312619744), (-20.923222767, -16.535592926))
            add(Edge.make_bspline(
                [(-20.923222767, -16.535592926), (-17.421359117, -12.367884155), (-16.304170077, -14.302912333)],
                knots=[0, 0, 0, 1, 1, 1], degree=2, weights=[1, 0.573849648, 1]))
            Line((-16.304170077, -14.302912333), (-17.431886861, -12.349649567))
        make_face()
    extrude(amount=FILLET_7_DEPTH, mode=Mode.SUBTRACT)

    # 倒角4
    chamfer_4_edges = [part_1.edges().sort_by_distance(p)[0] for p in [
        (-48.720756898, 12.4, 28.12894211),
    ]]
    chamfer(chamfer_4_edges, length=CHAMFER_4_SIZE)

    # 圆角9
    fillet_9_edges = [part_1.edges().sort_by_distance(p)[0] for p in [
        (-34.611399325, 1.2, 14.209398026),
        (-29.611399325, 1.2, 22.869652063),
    ]]
    fillet(fillet_9_edges, radius=FILLET_9_R)


solid = part_1.part
